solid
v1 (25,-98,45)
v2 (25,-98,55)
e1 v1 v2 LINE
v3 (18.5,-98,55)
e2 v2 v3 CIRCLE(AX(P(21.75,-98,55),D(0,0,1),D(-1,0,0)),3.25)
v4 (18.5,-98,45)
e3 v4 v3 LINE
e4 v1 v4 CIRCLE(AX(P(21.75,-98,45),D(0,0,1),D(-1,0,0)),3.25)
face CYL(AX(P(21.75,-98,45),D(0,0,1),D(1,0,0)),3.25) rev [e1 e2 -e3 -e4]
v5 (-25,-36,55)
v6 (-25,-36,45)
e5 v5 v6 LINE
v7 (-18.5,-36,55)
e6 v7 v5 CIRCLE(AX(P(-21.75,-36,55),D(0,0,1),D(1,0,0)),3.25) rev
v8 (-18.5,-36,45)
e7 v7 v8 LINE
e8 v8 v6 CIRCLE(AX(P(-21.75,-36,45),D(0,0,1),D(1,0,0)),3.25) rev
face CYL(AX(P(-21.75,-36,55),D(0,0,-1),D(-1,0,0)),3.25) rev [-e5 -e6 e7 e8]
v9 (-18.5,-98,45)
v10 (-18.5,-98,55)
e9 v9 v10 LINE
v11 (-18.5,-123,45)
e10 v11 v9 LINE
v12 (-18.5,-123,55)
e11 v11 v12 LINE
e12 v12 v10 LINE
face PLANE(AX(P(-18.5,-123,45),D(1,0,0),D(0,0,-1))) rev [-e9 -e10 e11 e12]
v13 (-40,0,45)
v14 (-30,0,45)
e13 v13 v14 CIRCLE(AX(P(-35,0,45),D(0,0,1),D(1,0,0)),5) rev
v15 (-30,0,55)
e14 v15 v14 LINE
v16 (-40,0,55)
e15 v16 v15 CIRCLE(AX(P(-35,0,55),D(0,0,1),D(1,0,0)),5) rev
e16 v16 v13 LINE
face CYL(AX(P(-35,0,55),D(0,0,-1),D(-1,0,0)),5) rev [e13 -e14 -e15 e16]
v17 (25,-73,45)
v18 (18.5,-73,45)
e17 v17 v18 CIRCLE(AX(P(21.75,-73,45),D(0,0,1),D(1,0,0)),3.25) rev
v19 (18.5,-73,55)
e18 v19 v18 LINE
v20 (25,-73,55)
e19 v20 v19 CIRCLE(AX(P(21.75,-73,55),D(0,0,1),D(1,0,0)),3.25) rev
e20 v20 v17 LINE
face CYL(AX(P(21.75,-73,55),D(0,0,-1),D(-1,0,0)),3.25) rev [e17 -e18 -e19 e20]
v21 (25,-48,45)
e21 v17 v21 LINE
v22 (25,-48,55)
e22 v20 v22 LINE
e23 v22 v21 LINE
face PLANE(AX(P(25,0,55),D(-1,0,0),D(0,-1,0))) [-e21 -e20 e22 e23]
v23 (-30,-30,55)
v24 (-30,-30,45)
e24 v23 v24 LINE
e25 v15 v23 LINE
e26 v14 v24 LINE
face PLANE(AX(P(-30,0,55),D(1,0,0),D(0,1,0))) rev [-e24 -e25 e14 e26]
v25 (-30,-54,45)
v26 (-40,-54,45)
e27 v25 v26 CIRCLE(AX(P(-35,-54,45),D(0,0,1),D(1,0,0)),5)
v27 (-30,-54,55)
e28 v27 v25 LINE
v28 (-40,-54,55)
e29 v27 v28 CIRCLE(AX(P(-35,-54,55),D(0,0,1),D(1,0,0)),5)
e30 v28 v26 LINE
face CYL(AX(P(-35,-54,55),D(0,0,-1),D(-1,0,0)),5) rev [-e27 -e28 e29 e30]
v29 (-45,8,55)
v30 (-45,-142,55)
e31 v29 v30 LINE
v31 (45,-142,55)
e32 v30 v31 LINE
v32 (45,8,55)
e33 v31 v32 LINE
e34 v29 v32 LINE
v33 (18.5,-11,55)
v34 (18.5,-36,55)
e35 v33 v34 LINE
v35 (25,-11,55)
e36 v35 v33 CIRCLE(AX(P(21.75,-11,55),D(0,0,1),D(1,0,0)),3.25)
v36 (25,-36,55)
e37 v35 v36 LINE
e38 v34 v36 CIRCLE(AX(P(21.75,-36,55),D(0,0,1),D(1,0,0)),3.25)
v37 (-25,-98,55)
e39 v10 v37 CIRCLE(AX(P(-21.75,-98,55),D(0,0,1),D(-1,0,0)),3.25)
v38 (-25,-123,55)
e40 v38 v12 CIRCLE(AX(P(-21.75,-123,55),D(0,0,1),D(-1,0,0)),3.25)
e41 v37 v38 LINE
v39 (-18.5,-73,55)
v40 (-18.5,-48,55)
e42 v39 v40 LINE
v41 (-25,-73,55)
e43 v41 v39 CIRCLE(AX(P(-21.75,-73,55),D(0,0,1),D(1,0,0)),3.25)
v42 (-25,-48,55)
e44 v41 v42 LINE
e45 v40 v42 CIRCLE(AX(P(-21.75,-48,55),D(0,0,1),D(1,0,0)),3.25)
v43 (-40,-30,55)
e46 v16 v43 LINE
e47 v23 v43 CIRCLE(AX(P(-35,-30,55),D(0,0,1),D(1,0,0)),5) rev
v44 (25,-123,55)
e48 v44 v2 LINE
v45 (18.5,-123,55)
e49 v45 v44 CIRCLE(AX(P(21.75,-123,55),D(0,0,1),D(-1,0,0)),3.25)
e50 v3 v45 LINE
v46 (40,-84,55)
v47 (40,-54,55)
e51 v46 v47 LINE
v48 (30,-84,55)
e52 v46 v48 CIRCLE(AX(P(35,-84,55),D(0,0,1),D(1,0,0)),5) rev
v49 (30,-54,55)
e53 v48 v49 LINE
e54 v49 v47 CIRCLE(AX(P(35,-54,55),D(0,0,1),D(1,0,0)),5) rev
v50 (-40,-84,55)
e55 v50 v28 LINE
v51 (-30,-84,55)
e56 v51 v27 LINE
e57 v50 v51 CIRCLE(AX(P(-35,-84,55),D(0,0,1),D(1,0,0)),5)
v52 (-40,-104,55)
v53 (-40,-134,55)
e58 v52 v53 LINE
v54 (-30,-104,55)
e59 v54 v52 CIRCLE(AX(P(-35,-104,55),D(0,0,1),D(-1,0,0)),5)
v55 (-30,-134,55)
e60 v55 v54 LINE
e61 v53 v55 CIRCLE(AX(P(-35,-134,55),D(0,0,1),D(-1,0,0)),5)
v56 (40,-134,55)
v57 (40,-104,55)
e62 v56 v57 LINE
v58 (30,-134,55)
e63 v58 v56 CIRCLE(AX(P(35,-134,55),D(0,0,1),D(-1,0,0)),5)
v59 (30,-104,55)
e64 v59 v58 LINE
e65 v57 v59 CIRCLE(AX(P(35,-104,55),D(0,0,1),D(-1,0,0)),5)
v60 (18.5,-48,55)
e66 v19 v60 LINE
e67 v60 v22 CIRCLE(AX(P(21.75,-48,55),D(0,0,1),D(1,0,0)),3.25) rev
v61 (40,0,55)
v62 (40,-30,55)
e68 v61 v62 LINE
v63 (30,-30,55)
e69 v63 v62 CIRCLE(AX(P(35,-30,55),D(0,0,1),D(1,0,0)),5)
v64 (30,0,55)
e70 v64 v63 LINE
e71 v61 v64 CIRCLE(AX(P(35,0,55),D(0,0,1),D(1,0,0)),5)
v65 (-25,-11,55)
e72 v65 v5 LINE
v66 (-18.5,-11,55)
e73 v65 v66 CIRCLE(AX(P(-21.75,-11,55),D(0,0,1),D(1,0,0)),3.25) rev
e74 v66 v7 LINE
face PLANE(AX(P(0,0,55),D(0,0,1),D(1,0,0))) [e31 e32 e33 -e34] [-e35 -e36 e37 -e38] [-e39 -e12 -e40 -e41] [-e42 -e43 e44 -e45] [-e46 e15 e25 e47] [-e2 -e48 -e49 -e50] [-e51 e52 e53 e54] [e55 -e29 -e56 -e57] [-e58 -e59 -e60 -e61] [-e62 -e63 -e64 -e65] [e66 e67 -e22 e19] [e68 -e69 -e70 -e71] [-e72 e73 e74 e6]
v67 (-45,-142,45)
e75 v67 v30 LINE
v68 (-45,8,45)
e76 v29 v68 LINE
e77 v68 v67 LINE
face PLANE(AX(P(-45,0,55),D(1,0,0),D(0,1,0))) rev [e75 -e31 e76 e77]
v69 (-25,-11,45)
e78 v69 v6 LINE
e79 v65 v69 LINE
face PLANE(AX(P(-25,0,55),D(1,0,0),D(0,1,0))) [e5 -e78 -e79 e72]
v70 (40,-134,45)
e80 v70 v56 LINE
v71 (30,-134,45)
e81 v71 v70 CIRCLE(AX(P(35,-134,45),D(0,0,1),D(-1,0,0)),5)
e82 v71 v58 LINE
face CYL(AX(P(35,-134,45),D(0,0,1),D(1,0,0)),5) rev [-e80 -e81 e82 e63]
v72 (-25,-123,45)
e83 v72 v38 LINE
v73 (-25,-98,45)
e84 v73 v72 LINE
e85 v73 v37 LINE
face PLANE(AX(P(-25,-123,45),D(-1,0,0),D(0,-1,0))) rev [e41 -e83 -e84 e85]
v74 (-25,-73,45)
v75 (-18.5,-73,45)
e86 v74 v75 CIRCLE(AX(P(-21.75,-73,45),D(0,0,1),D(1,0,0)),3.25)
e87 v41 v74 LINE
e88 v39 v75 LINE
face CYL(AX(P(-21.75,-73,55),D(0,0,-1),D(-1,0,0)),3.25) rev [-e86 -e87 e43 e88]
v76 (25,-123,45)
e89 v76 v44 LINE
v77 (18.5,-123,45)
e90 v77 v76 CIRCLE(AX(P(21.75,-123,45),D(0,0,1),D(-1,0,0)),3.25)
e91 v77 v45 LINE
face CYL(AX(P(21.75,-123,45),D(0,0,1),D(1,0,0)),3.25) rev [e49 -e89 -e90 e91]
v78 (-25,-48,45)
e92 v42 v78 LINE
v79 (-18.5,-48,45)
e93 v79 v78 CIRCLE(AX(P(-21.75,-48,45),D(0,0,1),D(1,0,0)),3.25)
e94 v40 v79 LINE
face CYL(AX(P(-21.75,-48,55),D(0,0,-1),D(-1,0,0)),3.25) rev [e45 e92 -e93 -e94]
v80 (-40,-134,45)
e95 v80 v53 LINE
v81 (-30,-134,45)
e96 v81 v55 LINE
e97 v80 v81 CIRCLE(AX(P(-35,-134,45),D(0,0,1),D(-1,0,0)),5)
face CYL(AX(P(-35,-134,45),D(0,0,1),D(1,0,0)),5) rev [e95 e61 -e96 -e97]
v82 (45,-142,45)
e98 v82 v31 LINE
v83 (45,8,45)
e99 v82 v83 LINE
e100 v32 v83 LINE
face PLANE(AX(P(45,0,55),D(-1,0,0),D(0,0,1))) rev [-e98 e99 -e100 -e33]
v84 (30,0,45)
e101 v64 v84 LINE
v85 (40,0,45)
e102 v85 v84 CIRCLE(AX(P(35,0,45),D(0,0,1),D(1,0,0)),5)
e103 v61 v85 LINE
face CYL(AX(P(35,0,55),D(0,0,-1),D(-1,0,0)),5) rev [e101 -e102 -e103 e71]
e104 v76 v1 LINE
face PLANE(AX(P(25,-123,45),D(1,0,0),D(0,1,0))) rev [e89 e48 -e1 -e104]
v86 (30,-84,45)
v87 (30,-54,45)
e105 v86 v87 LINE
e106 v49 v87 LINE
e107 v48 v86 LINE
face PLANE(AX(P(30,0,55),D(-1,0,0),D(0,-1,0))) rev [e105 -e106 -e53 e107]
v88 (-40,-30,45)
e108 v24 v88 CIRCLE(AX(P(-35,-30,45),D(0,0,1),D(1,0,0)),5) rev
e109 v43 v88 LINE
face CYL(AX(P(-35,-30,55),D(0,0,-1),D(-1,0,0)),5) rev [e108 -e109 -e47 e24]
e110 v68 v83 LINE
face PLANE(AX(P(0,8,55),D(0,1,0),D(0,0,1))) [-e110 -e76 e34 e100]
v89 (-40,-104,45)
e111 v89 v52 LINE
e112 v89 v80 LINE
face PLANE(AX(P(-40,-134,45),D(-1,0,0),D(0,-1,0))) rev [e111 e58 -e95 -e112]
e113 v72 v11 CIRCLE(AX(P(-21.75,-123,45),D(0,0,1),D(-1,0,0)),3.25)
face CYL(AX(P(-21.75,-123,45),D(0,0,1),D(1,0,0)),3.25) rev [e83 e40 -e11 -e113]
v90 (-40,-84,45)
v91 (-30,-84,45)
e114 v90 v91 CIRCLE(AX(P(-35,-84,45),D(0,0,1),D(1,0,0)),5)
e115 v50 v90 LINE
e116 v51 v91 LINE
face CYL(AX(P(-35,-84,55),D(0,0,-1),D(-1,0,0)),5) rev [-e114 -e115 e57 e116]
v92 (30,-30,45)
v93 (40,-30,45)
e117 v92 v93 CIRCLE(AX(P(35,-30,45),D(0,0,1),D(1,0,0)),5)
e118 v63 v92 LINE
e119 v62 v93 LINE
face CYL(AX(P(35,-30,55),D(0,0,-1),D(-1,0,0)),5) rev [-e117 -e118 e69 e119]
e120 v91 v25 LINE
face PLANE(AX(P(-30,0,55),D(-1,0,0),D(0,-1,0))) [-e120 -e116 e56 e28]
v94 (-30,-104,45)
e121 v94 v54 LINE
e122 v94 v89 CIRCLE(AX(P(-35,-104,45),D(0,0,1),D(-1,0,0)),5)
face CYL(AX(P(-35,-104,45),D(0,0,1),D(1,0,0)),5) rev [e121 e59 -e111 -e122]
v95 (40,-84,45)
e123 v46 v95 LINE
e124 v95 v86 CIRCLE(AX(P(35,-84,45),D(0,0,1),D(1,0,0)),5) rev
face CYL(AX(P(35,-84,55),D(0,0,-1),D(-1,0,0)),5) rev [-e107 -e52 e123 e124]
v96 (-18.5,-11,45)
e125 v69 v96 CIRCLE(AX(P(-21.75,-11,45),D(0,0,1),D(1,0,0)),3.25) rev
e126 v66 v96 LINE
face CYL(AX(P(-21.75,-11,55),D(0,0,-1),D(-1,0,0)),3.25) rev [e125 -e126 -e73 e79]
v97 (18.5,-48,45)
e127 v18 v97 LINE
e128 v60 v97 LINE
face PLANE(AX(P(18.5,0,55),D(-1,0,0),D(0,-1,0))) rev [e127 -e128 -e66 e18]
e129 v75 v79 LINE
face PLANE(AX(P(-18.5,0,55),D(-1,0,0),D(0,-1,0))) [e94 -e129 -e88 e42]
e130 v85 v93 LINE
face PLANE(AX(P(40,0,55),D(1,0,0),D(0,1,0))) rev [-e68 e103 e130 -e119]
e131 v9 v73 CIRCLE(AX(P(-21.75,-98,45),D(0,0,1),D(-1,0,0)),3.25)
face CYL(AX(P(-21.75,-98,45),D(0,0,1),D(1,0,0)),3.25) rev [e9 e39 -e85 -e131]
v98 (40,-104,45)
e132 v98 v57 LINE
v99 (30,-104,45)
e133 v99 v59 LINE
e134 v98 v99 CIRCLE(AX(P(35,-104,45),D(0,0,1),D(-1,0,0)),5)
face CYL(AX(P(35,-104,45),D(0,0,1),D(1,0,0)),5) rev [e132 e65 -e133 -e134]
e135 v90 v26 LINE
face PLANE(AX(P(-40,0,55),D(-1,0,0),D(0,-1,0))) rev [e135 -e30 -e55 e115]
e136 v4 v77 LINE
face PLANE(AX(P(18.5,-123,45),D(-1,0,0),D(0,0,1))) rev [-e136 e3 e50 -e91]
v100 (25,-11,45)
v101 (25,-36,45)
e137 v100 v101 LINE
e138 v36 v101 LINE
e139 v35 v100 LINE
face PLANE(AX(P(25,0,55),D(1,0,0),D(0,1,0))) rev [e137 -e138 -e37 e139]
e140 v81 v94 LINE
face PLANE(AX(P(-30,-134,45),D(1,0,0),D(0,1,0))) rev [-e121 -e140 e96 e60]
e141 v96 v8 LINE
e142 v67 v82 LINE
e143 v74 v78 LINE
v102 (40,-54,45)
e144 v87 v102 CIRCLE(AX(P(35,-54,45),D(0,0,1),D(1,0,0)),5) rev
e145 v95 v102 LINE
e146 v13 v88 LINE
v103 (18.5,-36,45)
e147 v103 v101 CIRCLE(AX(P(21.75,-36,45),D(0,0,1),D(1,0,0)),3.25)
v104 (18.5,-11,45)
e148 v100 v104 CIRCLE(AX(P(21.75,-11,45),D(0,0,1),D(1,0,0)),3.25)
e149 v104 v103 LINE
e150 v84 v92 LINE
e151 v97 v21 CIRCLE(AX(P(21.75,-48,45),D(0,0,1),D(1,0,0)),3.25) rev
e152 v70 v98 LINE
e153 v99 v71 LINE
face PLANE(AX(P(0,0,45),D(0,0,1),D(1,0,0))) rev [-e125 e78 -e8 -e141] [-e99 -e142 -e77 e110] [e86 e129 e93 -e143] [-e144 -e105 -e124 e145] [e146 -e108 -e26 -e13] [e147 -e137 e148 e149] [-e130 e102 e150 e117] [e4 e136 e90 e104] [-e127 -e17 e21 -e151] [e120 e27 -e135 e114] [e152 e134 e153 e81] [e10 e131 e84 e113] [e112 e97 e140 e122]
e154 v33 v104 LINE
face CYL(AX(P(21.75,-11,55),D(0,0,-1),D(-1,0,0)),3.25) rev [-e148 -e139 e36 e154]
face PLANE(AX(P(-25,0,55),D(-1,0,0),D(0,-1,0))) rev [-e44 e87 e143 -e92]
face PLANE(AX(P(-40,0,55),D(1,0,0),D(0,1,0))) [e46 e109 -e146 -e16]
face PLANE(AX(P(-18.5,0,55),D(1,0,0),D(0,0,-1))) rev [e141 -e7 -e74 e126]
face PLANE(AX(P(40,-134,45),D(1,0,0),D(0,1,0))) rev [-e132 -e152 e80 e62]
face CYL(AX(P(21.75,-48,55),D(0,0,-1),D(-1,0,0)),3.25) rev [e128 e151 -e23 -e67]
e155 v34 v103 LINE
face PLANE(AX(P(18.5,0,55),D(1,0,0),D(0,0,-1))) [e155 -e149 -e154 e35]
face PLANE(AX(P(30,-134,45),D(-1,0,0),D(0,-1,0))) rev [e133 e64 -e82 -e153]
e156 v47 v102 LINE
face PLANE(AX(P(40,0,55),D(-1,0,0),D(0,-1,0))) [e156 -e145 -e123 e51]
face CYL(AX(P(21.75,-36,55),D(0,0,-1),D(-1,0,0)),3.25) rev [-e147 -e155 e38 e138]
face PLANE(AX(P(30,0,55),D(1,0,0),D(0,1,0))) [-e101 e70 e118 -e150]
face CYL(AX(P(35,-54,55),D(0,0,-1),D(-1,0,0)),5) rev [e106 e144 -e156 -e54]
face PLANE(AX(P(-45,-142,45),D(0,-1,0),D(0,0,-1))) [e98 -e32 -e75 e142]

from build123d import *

# Parameters (mm, degrees)
SPLIT_START       = 45
SPLIT_1_OUTLINE_W = 90
SPLIT_1_OUTLINE_H = 100
SPLIT_1_DEPTH     = 10
SKETCH_1_W        = 90
SKETCH_1_H        = 50
EXTRUDE_1_DEPTH   = 10


# Read off the part's stored shape, not the designer's step: 基材零件-專題-1
with BuildPart() as part:
    # Split 1 outline → Split 1 (new body)
    with BuildSketch(Plane.XY.offset(SPLIT_START)):
        with Locations((0, -42)):
            Rectangle(SPLIT_1_OUTLINE_W, SPLIT_1_OUTLINE_H)
        with BuildLine():
            Line((-40, -84), (-40, -54))
            ThreePointArc((-40, -54), (-35, -49), (-30, -54))
            Line((-30, -54), (-30, -84))
            ThreePointArc((-30, -84), (-35, -89), (-40, -84))
        make_face(mode=Mode.SUBTRACT)
        with BuildLine():
            Line((-25, -73), (-25, -48))
            ThreePointArc((-25, -48), (-21.75, -44.75), (-18.5, -48))
            Line((-18.5, -48), (-18.5, -73))
            ThreePointArc((-18.5, -73), (-21.75, -76.25), (-25, -73))
        make_face(mode=Mode.SUBTRACT)
        with BuildLine():
            Line((30, -84), (30, -54))
            ThreePointArc((30, -54), (35, -49), (40, -54))
            Line((40, -54), (40, -84))
            ThreePointArc((40, -84), (35, -89), (30, -84))
        make_face(mode=Mode.SUBTRACT)
        with BuildLine():
            Line((18.5, -73), (18.5, -48))
            ThreePointArc((18.5, -48), (21.75, -44.75), (25, -48))
            Line((25, -48), (25, -73))
            ThreePointArc((25, -73), (21.75, -76.25), (18.5, -73))
        make_face(mode=Mode.SUBTRACT)
        with BuildLine():
            Line((-18.5, -11), (-18.5, -36))
            ThreePointArc((-18.5, -36), (-21.75, -39.25), (-25, -36))
            Line((-25, -36), (-25, -11))
            ThreePointArc((-25, -11), (-21.75, -7.75), (-18.5, -11))
        make_face(mode=Mode.SUBTRACT)
        with BuildLine():
            ThreePointArc((-30, -30), (-35, -35), (-40, -30))
            Line((-40, -30), (-40, 0))
            ThreePointArc((-40, 0), (-35, 5), (-30, 0))
            Line((-30, 0), (-30, -30))
        make_face(mode=Mode.SUBTRACT)
        with BuildLine():
            Line((25, -11), (25, -36))
            ThreePointArc((25, -36), (21.75, -39.25), (18.5, -36))
            Line((18.5, -36), (18.5, -11))
            ThreePointArc((18.5, -11), (21.75, -7.75), (25, -11))
        make_face(mode=Mode.SUBTRACT)
        with BuildLine():
            ThreePointArc((40, -30), (35, -35), (30, -30))
            Line((30, -30), (30, 0))
            ThreePointArc((30, 0), (35, 5), (40, 0))
            Line((40, 0), (40, -30))
        make_face(mode=Mode.SUBTRACT)
    extrude(amount=SPLIT_1_DEPTH)

    # 草圖1 → 填料-伸長1 (add)
    with BuildSketch(Plane.XY.offset(55)):
        with Locations((0, -117)):
            Rectangle(SKETCH_1_W, SKETCH_1_H)
        with BuildLine():
            Line((40, -134), (40, -104))
            ThreePointArc((40, -104), (35, -99), (30, -104))
            Line((30, -104), (30, -134))
            ThreePointArc((30, -134), (35, -139), (40, -134))
        make_face(mode=Mode.SUBTRACT)
        with BuildLine():
            Line((25, -123), (25, -98))
            ThreePointArc((25, -98), (21.75, -94.75), (18.5, -98))
            Line((18.5, -98), (18.5, -123))
            ThreePointArc((18.5, -123), (21.75, -126.25), (25, -123))
        make_face(mode=Mode.SUBTRACT)
        with BuildLine():
            Line((-18.5, -123), (-18.5, -98))
            ThreePointArc((-18.5, -98), (-21.75, -94.75), (-25, -98))
            Line((-25, -98), (-25, -123))
            ThreePointArc((-25, -123), (-21.75, -126.25), (-18.5, -123))
        make_face(mode=Mode.SUBTRACT)
        with BuildLine():
            Line((-40, -134), (-40, -104))
            ThreePointArc((-40, -104), (-35, -99), (-30, -104))
            Line((-30, -104), (-30, -134))
            ThreePointArc((-30, -134), (-35, -139), (-40, -134))
        make_face(mode=Mode.SUBTRACT)
    extrude(amount=-EXTRUDE_1_DEPTH)


solid = part.part
